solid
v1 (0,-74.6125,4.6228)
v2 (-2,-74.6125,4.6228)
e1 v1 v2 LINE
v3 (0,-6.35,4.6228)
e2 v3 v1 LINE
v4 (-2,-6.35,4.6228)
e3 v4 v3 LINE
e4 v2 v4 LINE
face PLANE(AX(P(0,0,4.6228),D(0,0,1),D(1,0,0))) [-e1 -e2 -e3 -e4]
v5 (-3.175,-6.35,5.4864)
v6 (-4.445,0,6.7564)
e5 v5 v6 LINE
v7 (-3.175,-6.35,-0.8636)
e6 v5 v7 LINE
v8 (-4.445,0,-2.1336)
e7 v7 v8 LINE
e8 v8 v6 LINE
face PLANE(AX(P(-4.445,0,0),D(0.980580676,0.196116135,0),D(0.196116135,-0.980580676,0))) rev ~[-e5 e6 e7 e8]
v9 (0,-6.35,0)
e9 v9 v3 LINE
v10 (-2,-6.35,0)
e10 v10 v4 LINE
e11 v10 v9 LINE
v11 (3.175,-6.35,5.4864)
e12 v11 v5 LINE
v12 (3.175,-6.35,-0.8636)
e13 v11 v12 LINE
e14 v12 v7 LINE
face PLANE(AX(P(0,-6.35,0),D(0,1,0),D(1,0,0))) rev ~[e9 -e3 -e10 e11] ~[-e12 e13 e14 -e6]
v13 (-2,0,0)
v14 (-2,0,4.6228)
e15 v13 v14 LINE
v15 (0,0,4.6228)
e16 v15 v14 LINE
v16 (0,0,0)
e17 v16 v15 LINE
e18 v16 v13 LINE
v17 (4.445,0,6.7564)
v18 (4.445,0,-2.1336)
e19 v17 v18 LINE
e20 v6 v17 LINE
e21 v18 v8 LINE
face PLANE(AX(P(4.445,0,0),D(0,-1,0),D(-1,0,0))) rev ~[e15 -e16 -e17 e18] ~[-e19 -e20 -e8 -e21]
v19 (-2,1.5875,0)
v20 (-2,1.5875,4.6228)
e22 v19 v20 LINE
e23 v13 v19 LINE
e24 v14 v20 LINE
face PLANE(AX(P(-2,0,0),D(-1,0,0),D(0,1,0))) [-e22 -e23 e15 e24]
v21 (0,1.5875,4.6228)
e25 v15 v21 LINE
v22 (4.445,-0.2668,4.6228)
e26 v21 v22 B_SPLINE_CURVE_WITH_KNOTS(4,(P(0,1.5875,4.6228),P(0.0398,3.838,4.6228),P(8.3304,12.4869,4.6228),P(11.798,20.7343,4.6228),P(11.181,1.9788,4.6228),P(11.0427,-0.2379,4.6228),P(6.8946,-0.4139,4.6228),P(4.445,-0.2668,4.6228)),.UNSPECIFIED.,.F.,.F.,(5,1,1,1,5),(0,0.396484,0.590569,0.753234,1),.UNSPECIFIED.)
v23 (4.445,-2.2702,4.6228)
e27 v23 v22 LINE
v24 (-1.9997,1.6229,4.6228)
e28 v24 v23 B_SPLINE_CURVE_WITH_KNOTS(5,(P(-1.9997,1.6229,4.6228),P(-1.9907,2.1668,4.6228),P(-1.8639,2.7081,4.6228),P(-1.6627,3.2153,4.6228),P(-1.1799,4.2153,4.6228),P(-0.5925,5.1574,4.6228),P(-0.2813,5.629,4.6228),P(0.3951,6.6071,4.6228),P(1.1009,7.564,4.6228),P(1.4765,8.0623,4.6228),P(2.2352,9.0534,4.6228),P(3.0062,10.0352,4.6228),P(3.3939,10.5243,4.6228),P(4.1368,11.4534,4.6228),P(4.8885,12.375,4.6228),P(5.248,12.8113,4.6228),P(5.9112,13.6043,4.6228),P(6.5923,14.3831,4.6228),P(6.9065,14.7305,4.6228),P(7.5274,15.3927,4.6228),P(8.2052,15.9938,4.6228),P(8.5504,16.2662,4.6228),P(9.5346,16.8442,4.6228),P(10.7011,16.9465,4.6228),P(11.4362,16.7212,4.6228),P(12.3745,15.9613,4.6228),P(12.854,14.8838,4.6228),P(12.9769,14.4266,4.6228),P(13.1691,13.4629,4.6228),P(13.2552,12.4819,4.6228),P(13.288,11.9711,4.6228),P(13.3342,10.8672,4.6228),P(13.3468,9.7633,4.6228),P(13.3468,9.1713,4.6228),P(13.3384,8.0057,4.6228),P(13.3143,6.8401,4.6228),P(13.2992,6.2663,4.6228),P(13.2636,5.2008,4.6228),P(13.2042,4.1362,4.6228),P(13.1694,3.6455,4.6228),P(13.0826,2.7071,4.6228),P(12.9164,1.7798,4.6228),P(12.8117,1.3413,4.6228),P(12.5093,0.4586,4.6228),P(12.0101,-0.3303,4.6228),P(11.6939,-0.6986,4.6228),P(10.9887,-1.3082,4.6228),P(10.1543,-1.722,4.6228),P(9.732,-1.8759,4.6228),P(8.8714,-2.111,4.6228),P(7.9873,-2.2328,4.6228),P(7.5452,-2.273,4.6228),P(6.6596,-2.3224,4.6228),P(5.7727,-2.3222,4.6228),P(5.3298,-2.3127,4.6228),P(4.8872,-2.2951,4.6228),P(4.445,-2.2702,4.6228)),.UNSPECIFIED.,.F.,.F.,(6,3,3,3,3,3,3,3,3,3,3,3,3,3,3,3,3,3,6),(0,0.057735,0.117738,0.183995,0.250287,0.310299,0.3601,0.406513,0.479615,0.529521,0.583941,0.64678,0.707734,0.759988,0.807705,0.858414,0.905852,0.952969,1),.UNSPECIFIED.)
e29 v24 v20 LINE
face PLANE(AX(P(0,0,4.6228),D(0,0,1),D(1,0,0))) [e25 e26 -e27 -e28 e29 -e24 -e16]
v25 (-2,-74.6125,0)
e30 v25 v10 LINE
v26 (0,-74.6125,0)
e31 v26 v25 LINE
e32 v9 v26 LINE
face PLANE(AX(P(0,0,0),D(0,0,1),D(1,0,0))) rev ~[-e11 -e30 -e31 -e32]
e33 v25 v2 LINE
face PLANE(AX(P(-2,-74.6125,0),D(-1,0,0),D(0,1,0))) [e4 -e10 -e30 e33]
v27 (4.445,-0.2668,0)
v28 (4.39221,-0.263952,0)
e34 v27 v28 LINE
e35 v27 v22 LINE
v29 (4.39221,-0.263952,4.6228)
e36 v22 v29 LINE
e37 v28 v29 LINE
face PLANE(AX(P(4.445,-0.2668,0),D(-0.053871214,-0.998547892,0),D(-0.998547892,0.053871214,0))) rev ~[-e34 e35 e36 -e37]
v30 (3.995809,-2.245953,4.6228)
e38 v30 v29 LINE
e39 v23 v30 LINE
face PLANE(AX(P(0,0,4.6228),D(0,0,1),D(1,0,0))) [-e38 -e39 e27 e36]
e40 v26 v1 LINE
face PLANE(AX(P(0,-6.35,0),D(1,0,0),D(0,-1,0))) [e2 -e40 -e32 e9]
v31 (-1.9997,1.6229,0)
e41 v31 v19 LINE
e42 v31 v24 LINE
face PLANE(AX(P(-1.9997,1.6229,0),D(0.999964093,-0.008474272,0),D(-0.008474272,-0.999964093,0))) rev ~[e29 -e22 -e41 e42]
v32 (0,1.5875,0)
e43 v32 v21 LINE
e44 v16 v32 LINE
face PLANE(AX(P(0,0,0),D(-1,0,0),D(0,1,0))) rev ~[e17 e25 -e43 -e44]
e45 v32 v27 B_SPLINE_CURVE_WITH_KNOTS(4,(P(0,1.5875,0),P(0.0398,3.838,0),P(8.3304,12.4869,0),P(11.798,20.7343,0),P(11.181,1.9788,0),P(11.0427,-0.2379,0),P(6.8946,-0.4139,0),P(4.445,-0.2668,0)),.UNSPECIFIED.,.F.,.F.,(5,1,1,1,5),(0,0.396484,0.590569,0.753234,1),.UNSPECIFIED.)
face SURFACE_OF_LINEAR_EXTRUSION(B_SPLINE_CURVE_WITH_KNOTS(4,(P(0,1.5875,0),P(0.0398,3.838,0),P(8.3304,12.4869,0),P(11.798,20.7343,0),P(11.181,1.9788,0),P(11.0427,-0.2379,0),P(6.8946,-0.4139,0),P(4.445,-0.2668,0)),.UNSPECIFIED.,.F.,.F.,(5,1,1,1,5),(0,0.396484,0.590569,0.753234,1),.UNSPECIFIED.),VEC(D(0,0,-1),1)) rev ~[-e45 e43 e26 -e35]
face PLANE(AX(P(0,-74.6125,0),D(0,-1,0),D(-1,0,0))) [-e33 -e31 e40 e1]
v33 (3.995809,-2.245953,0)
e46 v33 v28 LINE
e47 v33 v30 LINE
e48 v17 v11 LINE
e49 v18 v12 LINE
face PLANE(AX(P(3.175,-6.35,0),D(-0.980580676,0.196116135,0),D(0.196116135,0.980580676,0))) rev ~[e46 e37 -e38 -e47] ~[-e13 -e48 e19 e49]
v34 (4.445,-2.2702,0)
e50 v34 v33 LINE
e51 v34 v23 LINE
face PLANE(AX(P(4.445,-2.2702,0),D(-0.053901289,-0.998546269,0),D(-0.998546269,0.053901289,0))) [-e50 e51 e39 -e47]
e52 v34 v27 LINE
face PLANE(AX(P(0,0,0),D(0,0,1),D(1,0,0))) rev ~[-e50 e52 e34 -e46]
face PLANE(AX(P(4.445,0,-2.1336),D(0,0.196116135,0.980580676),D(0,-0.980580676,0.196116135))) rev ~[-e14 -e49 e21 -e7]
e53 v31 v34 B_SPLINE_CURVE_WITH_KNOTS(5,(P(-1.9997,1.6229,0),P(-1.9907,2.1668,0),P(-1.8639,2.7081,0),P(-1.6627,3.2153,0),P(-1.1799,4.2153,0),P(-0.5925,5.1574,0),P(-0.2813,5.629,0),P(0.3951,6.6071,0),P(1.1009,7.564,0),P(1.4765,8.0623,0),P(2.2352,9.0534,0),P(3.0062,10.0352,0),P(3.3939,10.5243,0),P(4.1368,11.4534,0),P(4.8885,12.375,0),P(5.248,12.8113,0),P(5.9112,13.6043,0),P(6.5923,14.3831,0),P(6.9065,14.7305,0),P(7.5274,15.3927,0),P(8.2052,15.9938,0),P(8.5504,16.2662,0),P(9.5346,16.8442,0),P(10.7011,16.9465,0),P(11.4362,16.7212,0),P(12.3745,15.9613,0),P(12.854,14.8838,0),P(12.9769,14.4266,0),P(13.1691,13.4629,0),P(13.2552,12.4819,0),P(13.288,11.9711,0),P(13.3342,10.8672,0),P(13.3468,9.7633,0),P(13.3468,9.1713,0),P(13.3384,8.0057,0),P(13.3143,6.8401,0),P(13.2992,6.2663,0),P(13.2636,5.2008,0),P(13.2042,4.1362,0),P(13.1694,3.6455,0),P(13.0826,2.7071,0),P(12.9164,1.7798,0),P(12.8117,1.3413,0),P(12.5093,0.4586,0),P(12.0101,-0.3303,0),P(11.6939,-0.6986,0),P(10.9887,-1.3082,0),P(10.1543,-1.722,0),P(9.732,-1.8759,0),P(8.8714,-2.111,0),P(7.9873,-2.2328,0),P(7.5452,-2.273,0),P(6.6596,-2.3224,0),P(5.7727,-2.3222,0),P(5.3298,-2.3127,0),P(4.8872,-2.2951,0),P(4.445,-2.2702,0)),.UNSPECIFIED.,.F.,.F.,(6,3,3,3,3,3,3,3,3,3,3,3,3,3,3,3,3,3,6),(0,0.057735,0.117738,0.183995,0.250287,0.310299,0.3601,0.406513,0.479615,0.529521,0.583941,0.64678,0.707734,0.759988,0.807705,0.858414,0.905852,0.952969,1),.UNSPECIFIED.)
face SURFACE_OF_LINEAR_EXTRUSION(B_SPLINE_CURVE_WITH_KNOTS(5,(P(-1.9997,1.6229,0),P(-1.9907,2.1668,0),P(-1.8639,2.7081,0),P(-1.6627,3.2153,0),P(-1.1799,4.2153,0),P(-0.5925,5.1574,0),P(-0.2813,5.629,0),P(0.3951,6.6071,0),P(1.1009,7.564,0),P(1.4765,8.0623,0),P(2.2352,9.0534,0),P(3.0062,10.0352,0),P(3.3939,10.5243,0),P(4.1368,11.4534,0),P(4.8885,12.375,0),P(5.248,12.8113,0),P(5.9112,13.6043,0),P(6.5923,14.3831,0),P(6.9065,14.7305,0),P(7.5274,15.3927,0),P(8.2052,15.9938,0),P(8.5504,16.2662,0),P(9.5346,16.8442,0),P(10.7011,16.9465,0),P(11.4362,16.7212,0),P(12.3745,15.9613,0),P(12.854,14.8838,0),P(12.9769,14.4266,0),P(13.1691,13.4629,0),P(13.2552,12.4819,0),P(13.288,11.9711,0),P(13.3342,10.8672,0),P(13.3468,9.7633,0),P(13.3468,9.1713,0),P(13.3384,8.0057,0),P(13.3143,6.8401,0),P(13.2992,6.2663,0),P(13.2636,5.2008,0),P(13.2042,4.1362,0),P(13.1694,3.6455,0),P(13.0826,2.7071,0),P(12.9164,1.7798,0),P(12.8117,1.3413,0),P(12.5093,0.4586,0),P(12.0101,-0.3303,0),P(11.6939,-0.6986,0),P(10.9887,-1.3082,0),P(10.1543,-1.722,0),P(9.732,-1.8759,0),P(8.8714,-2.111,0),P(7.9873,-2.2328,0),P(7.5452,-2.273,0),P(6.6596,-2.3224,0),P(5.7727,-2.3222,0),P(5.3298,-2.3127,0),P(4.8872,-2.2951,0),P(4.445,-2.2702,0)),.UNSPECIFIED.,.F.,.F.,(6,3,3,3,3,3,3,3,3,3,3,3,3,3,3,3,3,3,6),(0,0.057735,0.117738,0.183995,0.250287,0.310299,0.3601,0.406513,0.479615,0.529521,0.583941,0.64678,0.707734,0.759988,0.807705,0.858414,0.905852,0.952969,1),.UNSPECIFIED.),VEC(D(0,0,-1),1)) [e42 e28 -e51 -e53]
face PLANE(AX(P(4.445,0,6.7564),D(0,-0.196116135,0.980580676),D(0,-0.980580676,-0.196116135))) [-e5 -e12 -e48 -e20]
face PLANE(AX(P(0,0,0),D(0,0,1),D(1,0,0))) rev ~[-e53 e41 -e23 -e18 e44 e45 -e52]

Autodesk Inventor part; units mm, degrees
ref_plane "YZ Plane" through (0, 0, 0) normal (1, 0, 0) x (0, 1, 0)
ref_plane "XZ Plane" through (0, 0, 0) normal (0, 1, 0) x (-1, 0, 0)
ref_plane "XY Plane" through (0, 0, 0) normal (0, 0, 1) x (1, 0, 0)
sketch "Sketch1" plane through (0, 0, 0) normal (0, 0, 1) x (1, 0, 0)
  line L0 (0, 0) -> (-3.6068, 0) construction
  line L1 (0, 0) -> (0, 1.5875)
  line L2 (-3.6068, 1.5875) -> (0, 1.5875) construction
  line L3 (-3.6068, 0) -> (-3.6068, 1.5875) construction
  line L4 (10.8966, 3.321) -> (10.8966, 13.3477) construction
  line L5 (10.8966, 14.2875) -> (10.8966, 13.2715) construction
  line L6 (9.3091, 14.2875) -> (10.8966, 14.2875) construction
  line L7 (10.8966, 3.3972) -> (10.8966, 2.3813) construction
  spline S0 degree 3 poles (10.8966, 2.3813) (10.8966, 1.718) (10.6045, 1.06) (10.1126, 0.6151) knots 0 0 0 0 1 1 1 1 construction
  spline S1 degree 3 poles (10.1126, 0.6151) (9.6798, 0.2237) (9.0989, 0) (8.5153, 0) knots 0 0 0 0 1 1 1 1 construction
  line L8 (-4.445, 0) -> (-4.445, -6.35)
  line L9 (-4.445, -6.35) -> (4.445, -6.35)
  line L10 (4.445, -6.35) -> (4.445, 0)
  spline S2 degree 4 poles (0, 1.5875) (0.0398, 3.838) (8.3304, 12.4869) (11.798, 20.7343) (11.181, 1.9788) (11.0427, -0.2379) (6.8946, -0.4139) (4.445, -0.2668) knots 0 0 0 0 0 0.396484 0.590569 0.753234 1 1 1 1 1
  line L11 (11.3428, 2.8356) -> (10.0194, -0.0386) construction
  arc A0 (9.9788, 0.4386) -> (10.9538, 2.5562) centre (7.964, 2.6496) ccw construction
  line L12 (-0.0202, 0.4489) -> (0.0202, 2.7261) construction
  arc A1 (0.2539, 2.3166) -> (0.228, 0.8499) centre (1.2364, 1.5656) ccw construction
  line L13 (0, 1.5875) -> (0, -74.6125)
  line L14 (0, -74.6125) -> (-2, -74.6125)
  line L15 (-2, -74.6125) -> (-2, 1.5875)
  line L16 (-1.9997, 1.6229) -> (-2, 1.5875)
  line L17 (7.7554, -0.4656) -> (1.1346, -0.0679) construction
  arc A2 (1.8128, 0.0031) -> (7.0906, -0.314) centre (6.3271, 31.0611) ccw construction
  line L18 (4.445, -2.2702) -> (1.1345, -2.0915)
  line L19 (4.445, -0.2668) -> (1.1345, -0.0882)
  line L20 (1.1345, -2.0915) -> (1.1345, -0.0882)
  line L21 (4.445, 0) -> (-4.445, 0)
  spline S3 degree 5 poles (-1.9997, 1.6229) (-1.9907, 2.1668) (-1.8639, 2.7081) (-1.6627, 3.2153) (-1.1799, 4.2153) (-0.5925, 5.1574) (-0.2813, 5.629) (0.3951, 6.6071) (1.1009, 7.564) (1.4765, 8.0623) (2.2352, 9.0534) (3.0062, 10.0352) (3.3939, 10.5243) (4.1368, 11.4534) (4.8885, 12.375) (5.248, 12.8113) (5.9112, 13.6043) (6.5923, 14.3831) (6.9065, 14.7305) (7.5274, 15.3927) (8.2052, 15.9938) (8.5504, 16.2662) (9.5346, 16.8442) (10.7011, 16.9465) (11.4362, 16.7212) (12.3745, 15.9613) (12.854, 14.8838) (12.9769, 14.4266) (13.1691, 13.4629) (13.2552, 12.4819) (13.288, 11.9711) (13.3342, 10.8672) (13.3468, 9.7633) (13.3468, 9.1713) (13.3384, 8.0057) (13.3143, 6.8401) (13.2992, 6.2663) (13.2636, 5.2008) (13.2042, 4.1362) (13.1694, 3.6455) (13.0826, 2.7071) (12.9164, 1.7798) (12.8117, 1.3413) (12.5093, 0.4586) (12.0101, -0.3303) (11.6939, -0.6986) (10.9887, -1.3082) (10.1543, -1.722) (9.732, -1.8759) (8.8714, -2.111) (7.9873, -2.2328) (7.5452, -2.273) (6.6596, -2.3224) (5.7727, -2.3222) (5.3298, -2.3127) (4.8872, -2.2951) (4.445, -2.2702) knots 0 0 0 0 0 0 0.057735 0.057735 0.057735 0.117738 0.117738 0.117738 0.183995 0.183995 0.183995 0.250287 0.250287 0.250287 0.310299 0.310299 0.310299 0.3601 0.3601 0.3601 0.406513 0.406513 0.406513 0.479615 0.479615 0.479615 0.529521 0.529521 0.529521 0.583941 0.583941 0.583941 0.64678 0.64678 0.64678 0.707734 0.707734 0.707734 0.759988 0.759988 0.759988 0.807705 0.807705 0.807705 0.858414 0.858414 0.858414 0.905852 0.905852 0.905852 0.952969 0.952969 0.952969 1 1 1 1 1 1
  point P0 (10.6811, 1.3985)
extrude "head part" add sketch "Sketch1" along normal blind 6.7564 and the other way blind 2.1336 contours L21 L10 L19 L20 L18 L9 L13 | L13 L9 L15 L21 | L15 L9 L8 L21 | L10 L18 L20 L19
sketch "Sketch2" plane through (4.445, -6.35, 6.7564) normal (1, 0, 0) x (0, 0, -1)
  line L0 (0, 0) -> (0, 6.35) projected
  line L1 (8.89, 0) -> (0, 0) projected
  line L2 (8.89, 6.35) -> (8.89, 0) projected
  line L3 (0, 6.35) -> (1.27, 0)
  line L4 (8.89, 6.35) -> (7.62, 0)
  dimension "d27" = 1.27
  dimension "d28" = 1.27
extrude "side cuts" cut sketch "Sketch2" against normal blind 8.89
sketch "Sketch4" plane through (0, 0, 0) normal (0, 0, 1) x (1, 0, 0)
  line L0 (4.445, -6.35) -> (4.445, 0) projected
  line L1 (-4.445, -6.35) -> (4.445, -6.35) projected
  line L2 (-4.445, 0) -> (-4.445, -6.35) projected
  line L3 (-4.445, -6.35) -> (-4.445, 0) projected
  line L4 (-4.445, 0) -> (-3.175, -6.35)
  line L5 (4.445, -6.35) -> (-4.445, -6.35) projected
  line L6 (3.175, -6.35) -> (4.445, 0)
  dimension "d29" = 1.27
  dimension "d30" = 1.27
extrude "top cuts" cut sketch "Sketch4" along normal through all both and the other way through all
extrude "tie part" add sketch "Sketch1" along normal blind 4.6228 contours L21 L15 L16 S3 L10 S2 L1 | L13 L9 L15 L21 | L13 L14 L15 L9 | L10 L18 L20 L19
properties part number "Cata zip tie"
